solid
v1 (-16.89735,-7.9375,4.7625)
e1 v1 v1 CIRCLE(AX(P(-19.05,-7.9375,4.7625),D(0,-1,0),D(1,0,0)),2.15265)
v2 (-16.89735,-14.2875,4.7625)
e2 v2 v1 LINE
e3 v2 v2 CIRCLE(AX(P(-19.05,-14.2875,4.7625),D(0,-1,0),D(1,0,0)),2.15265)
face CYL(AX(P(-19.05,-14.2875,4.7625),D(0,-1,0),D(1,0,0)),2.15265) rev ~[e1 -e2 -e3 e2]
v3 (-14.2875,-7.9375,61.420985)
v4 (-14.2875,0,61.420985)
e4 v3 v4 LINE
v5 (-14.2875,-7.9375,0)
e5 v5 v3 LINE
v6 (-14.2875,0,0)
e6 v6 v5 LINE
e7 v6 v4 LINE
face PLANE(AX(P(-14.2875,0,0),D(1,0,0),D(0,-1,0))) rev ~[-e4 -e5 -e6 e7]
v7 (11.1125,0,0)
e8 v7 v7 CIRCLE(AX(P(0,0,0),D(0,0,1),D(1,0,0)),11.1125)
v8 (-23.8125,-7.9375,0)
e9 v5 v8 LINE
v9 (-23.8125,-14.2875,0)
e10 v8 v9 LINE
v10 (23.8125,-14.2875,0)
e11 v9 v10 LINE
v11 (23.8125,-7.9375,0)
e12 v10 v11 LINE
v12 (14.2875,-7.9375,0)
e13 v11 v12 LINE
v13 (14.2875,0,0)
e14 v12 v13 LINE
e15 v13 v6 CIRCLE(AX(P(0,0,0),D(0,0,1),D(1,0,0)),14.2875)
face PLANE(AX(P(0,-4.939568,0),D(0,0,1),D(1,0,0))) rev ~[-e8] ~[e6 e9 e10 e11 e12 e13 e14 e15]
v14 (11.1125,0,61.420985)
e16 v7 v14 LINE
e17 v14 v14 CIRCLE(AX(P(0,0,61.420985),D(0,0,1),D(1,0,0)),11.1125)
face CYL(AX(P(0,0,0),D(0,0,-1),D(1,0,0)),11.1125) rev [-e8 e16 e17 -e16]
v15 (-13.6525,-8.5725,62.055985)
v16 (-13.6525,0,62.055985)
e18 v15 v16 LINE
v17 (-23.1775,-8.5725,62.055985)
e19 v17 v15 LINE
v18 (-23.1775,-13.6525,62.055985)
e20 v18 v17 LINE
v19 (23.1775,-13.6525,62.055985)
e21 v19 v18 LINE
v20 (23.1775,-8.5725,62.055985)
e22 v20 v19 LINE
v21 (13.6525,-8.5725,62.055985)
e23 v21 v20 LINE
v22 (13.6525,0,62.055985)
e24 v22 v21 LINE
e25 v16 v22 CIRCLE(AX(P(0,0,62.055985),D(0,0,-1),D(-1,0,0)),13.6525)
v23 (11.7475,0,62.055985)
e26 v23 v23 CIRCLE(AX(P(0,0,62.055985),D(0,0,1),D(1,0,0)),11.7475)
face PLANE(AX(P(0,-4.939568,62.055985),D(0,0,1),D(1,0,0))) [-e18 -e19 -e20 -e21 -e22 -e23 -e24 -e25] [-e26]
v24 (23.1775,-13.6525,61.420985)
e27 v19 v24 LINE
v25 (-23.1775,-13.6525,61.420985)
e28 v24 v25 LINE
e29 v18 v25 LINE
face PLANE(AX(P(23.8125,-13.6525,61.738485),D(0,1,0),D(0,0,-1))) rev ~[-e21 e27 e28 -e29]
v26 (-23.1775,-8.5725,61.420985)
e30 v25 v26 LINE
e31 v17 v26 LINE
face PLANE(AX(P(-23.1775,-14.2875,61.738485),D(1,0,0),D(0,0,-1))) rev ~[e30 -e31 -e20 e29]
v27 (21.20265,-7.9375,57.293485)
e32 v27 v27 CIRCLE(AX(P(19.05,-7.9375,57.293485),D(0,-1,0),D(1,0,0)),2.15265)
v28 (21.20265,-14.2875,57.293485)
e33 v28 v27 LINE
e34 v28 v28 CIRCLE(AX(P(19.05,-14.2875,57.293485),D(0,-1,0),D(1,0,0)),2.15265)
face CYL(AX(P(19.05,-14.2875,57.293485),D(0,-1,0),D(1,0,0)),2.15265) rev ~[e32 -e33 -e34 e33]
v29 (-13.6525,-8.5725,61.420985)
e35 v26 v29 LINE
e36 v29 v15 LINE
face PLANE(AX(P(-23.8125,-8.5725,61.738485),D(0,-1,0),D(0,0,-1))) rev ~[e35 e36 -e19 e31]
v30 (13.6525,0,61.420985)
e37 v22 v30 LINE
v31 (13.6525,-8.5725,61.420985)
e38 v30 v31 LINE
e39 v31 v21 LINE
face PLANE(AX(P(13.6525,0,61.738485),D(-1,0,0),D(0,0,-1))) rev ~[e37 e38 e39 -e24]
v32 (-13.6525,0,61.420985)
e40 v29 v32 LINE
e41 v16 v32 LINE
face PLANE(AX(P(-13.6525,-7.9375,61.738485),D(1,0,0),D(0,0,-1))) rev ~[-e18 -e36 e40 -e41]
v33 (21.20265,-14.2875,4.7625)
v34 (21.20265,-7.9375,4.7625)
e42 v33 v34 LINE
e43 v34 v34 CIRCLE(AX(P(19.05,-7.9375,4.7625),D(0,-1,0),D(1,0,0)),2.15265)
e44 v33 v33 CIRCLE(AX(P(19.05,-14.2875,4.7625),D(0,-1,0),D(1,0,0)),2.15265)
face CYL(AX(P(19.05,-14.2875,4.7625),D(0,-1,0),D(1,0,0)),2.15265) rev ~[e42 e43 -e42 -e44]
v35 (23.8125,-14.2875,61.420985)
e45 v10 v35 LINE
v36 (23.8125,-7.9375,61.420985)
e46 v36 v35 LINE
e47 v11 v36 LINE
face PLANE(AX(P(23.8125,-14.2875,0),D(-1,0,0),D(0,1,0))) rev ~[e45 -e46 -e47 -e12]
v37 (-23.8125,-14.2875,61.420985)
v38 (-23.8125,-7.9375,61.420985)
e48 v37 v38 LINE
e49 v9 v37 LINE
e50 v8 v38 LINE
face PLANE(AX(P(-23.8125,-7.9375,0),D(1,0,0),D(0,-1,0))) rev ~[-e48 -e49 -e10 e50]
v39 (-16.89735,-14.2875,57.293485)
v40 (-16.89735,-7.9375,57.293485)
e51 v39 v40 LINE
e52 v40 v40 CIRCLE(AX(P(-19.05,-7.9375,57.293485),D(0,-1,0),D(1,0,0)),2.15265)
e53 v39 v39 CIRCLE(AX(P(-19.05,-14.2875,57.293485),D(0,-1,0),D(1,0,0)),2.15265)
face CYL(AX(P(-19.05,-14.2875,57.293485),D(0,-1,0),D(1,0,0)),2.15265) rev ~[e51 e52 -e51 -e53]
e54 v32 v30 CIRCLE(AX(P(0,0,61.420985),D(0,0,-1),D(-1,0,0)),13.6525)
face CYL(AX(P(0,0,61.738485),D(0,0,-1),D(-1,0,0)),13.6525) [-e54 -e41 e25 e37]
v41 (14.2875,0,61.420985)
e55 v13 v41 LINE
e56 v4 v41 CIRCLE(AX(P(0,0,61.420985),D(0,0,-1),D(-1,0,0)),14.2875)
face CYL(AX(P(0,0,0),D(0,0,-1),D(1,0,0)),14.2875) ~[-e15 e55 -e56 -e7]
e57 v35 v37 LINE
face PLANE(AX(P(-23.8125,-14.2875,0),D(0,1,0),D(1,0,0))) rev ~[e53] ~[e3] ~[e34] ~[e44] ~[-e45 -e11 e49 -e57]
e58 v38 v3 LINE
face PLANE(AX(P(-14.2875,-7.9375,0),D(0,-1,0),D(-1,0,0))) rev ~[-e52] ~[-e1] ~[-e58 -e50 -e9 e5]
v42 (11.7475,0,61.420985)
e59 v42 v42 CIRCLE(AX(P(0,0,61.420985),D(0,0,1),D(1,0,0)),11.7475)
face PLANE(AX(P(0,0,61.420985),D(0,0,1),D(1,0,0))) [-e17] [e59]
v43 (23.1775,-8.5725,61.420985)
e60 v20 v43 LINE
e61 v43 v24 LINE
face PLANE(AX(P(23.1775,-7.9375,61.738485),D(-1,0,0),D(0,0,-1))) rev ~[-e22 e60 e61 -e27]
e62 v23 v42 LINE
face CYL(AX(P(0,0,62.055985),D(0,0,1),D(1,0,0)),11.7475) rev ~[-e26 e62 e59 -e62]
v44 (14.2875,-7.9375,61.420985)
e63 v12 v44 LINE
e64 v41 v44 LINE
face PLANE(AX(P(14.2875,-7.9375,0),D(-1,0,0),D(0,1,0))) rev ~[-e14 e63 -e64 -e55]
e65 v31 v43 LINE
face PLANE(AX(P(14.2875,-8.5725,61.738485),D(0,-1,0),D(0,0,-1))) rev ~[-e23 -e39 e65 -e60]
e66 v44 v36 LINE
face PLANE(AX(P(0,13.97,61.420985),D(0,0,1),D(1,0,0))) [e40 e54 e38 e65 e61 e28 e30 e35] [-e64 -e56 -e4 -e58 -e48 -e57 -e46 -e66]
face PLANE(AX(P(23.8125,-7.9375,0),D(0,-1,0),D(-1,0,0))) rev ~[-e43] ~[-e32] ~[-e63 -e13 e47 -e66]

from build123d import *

# Parameters (mm, degrees)
F0_R     = 11.1125
F1_DEPTH = 62.0559846
F2_R     = 2.15265
F3_DEPTH = 6.35
F4_W     = 0.635
F4_H     = 0.635
F6_R     = 11.7475
F6_R_2   = 11.1125
F7_DEPTH = 0.635


# Not quite as in the source:
# - an extrude ends at something that could not be found from the text; its depth is read off the source's solid


with BuildPart() as f1:
    # F0 (on Top) → F1 (new body)
    with BuildSketch(Plane.XY):
        with BuildLine():
            ThreePointArc((14.2875, 0), (0, 14.2875), (-14.2875, 0))
            Line((-14.2875, 0), (-14.2875, -7.9375))
            Line((-14.2875, -7.9375), (-23.8125, -7.9375))
            Line((-23.8125, -7.9375), (-23.8125, -14.2875))
            Line((-23.8125, -14.2875), (23.8125, -14.2875))
            Line((23.8125, -14.2875), (23.8125, -7.9375))
            Line((23.8125, -7.9375), (14.2875, -7.9375))
            Line((14.2875, -7.9375), (14.2875, 0))
        make_face()
        Circle(F0_R, mode=Mode.SUBTRACT)
    extrude(amount=F1_DEPTH)

    # F2 (on face) → F3 (cut, through all)
    with BuildSketch(Plane.XZ.offset(14.2875)):
        with Locations((-19.05, 4.7625)):
            Circle(F2_R)
        with Locations((-19.05, 57.2934846)):
            Circle(F2_R)
        with Locations((19.05, 57.2934846)):
            Circle(F2_R)
        with Locations((19.05, 4.7625)):
            Circle(F2_R)
    extrude(amount=-F3_DEPTH, mode=Mode.SUBTRACT)

    # F5: sweep along a path in F5_path
    with BuildLine(Plane(origin=(23.8125, -14.2875, 62.0559846), x_dir=(0, -1, 0), z_dir=(0, 0, -1))) as f5_path:
        Line((0, 0), (0, 47.625))
        Line((0, 47.625), (-6.35, 47.625))
        Line((-6.35, 47.625), (-6.35, 38.1))
        Line((-6.35, 38.1), (-14.2875, 38.1))
        ThreePointArc((-14.2875, 38.1), (-28.575, 23.8125), (-14.2875, 9.525))
        Line((-14.2875, 9.525), (-6.35, 9.525))
        Line((-6.35, 9.525), (-6.35, 0))
        Line((-6.35, 0), (0, 0))
    # F4 (on face) → F5 (sweep, cut)
    with BuildSketch(Plane(origin=(-23.8125, 0, 0), x_dir=(0, -1, 0), z_dir=(-1, 0, 0))):
        with Locations((13.97, 61.7384846)):
            Rectangle(F4_W, F4_H)
    sweep(path=f5_path.line, transition=Transition.RIGHT, mode=Mode.SUBTRACT)

    # F6 (on face) → F7 (cut, through all)
    with BuildSketch(Plane.XY.offset(62.0559846)):
        Circle(F6_R)
        Circle(F6_R_2, mode=Mode.SUBTRACT)
    extrude(amount=-F7_DEPTH, mode=Mode.SUBTRACT)


solid = f1.part
